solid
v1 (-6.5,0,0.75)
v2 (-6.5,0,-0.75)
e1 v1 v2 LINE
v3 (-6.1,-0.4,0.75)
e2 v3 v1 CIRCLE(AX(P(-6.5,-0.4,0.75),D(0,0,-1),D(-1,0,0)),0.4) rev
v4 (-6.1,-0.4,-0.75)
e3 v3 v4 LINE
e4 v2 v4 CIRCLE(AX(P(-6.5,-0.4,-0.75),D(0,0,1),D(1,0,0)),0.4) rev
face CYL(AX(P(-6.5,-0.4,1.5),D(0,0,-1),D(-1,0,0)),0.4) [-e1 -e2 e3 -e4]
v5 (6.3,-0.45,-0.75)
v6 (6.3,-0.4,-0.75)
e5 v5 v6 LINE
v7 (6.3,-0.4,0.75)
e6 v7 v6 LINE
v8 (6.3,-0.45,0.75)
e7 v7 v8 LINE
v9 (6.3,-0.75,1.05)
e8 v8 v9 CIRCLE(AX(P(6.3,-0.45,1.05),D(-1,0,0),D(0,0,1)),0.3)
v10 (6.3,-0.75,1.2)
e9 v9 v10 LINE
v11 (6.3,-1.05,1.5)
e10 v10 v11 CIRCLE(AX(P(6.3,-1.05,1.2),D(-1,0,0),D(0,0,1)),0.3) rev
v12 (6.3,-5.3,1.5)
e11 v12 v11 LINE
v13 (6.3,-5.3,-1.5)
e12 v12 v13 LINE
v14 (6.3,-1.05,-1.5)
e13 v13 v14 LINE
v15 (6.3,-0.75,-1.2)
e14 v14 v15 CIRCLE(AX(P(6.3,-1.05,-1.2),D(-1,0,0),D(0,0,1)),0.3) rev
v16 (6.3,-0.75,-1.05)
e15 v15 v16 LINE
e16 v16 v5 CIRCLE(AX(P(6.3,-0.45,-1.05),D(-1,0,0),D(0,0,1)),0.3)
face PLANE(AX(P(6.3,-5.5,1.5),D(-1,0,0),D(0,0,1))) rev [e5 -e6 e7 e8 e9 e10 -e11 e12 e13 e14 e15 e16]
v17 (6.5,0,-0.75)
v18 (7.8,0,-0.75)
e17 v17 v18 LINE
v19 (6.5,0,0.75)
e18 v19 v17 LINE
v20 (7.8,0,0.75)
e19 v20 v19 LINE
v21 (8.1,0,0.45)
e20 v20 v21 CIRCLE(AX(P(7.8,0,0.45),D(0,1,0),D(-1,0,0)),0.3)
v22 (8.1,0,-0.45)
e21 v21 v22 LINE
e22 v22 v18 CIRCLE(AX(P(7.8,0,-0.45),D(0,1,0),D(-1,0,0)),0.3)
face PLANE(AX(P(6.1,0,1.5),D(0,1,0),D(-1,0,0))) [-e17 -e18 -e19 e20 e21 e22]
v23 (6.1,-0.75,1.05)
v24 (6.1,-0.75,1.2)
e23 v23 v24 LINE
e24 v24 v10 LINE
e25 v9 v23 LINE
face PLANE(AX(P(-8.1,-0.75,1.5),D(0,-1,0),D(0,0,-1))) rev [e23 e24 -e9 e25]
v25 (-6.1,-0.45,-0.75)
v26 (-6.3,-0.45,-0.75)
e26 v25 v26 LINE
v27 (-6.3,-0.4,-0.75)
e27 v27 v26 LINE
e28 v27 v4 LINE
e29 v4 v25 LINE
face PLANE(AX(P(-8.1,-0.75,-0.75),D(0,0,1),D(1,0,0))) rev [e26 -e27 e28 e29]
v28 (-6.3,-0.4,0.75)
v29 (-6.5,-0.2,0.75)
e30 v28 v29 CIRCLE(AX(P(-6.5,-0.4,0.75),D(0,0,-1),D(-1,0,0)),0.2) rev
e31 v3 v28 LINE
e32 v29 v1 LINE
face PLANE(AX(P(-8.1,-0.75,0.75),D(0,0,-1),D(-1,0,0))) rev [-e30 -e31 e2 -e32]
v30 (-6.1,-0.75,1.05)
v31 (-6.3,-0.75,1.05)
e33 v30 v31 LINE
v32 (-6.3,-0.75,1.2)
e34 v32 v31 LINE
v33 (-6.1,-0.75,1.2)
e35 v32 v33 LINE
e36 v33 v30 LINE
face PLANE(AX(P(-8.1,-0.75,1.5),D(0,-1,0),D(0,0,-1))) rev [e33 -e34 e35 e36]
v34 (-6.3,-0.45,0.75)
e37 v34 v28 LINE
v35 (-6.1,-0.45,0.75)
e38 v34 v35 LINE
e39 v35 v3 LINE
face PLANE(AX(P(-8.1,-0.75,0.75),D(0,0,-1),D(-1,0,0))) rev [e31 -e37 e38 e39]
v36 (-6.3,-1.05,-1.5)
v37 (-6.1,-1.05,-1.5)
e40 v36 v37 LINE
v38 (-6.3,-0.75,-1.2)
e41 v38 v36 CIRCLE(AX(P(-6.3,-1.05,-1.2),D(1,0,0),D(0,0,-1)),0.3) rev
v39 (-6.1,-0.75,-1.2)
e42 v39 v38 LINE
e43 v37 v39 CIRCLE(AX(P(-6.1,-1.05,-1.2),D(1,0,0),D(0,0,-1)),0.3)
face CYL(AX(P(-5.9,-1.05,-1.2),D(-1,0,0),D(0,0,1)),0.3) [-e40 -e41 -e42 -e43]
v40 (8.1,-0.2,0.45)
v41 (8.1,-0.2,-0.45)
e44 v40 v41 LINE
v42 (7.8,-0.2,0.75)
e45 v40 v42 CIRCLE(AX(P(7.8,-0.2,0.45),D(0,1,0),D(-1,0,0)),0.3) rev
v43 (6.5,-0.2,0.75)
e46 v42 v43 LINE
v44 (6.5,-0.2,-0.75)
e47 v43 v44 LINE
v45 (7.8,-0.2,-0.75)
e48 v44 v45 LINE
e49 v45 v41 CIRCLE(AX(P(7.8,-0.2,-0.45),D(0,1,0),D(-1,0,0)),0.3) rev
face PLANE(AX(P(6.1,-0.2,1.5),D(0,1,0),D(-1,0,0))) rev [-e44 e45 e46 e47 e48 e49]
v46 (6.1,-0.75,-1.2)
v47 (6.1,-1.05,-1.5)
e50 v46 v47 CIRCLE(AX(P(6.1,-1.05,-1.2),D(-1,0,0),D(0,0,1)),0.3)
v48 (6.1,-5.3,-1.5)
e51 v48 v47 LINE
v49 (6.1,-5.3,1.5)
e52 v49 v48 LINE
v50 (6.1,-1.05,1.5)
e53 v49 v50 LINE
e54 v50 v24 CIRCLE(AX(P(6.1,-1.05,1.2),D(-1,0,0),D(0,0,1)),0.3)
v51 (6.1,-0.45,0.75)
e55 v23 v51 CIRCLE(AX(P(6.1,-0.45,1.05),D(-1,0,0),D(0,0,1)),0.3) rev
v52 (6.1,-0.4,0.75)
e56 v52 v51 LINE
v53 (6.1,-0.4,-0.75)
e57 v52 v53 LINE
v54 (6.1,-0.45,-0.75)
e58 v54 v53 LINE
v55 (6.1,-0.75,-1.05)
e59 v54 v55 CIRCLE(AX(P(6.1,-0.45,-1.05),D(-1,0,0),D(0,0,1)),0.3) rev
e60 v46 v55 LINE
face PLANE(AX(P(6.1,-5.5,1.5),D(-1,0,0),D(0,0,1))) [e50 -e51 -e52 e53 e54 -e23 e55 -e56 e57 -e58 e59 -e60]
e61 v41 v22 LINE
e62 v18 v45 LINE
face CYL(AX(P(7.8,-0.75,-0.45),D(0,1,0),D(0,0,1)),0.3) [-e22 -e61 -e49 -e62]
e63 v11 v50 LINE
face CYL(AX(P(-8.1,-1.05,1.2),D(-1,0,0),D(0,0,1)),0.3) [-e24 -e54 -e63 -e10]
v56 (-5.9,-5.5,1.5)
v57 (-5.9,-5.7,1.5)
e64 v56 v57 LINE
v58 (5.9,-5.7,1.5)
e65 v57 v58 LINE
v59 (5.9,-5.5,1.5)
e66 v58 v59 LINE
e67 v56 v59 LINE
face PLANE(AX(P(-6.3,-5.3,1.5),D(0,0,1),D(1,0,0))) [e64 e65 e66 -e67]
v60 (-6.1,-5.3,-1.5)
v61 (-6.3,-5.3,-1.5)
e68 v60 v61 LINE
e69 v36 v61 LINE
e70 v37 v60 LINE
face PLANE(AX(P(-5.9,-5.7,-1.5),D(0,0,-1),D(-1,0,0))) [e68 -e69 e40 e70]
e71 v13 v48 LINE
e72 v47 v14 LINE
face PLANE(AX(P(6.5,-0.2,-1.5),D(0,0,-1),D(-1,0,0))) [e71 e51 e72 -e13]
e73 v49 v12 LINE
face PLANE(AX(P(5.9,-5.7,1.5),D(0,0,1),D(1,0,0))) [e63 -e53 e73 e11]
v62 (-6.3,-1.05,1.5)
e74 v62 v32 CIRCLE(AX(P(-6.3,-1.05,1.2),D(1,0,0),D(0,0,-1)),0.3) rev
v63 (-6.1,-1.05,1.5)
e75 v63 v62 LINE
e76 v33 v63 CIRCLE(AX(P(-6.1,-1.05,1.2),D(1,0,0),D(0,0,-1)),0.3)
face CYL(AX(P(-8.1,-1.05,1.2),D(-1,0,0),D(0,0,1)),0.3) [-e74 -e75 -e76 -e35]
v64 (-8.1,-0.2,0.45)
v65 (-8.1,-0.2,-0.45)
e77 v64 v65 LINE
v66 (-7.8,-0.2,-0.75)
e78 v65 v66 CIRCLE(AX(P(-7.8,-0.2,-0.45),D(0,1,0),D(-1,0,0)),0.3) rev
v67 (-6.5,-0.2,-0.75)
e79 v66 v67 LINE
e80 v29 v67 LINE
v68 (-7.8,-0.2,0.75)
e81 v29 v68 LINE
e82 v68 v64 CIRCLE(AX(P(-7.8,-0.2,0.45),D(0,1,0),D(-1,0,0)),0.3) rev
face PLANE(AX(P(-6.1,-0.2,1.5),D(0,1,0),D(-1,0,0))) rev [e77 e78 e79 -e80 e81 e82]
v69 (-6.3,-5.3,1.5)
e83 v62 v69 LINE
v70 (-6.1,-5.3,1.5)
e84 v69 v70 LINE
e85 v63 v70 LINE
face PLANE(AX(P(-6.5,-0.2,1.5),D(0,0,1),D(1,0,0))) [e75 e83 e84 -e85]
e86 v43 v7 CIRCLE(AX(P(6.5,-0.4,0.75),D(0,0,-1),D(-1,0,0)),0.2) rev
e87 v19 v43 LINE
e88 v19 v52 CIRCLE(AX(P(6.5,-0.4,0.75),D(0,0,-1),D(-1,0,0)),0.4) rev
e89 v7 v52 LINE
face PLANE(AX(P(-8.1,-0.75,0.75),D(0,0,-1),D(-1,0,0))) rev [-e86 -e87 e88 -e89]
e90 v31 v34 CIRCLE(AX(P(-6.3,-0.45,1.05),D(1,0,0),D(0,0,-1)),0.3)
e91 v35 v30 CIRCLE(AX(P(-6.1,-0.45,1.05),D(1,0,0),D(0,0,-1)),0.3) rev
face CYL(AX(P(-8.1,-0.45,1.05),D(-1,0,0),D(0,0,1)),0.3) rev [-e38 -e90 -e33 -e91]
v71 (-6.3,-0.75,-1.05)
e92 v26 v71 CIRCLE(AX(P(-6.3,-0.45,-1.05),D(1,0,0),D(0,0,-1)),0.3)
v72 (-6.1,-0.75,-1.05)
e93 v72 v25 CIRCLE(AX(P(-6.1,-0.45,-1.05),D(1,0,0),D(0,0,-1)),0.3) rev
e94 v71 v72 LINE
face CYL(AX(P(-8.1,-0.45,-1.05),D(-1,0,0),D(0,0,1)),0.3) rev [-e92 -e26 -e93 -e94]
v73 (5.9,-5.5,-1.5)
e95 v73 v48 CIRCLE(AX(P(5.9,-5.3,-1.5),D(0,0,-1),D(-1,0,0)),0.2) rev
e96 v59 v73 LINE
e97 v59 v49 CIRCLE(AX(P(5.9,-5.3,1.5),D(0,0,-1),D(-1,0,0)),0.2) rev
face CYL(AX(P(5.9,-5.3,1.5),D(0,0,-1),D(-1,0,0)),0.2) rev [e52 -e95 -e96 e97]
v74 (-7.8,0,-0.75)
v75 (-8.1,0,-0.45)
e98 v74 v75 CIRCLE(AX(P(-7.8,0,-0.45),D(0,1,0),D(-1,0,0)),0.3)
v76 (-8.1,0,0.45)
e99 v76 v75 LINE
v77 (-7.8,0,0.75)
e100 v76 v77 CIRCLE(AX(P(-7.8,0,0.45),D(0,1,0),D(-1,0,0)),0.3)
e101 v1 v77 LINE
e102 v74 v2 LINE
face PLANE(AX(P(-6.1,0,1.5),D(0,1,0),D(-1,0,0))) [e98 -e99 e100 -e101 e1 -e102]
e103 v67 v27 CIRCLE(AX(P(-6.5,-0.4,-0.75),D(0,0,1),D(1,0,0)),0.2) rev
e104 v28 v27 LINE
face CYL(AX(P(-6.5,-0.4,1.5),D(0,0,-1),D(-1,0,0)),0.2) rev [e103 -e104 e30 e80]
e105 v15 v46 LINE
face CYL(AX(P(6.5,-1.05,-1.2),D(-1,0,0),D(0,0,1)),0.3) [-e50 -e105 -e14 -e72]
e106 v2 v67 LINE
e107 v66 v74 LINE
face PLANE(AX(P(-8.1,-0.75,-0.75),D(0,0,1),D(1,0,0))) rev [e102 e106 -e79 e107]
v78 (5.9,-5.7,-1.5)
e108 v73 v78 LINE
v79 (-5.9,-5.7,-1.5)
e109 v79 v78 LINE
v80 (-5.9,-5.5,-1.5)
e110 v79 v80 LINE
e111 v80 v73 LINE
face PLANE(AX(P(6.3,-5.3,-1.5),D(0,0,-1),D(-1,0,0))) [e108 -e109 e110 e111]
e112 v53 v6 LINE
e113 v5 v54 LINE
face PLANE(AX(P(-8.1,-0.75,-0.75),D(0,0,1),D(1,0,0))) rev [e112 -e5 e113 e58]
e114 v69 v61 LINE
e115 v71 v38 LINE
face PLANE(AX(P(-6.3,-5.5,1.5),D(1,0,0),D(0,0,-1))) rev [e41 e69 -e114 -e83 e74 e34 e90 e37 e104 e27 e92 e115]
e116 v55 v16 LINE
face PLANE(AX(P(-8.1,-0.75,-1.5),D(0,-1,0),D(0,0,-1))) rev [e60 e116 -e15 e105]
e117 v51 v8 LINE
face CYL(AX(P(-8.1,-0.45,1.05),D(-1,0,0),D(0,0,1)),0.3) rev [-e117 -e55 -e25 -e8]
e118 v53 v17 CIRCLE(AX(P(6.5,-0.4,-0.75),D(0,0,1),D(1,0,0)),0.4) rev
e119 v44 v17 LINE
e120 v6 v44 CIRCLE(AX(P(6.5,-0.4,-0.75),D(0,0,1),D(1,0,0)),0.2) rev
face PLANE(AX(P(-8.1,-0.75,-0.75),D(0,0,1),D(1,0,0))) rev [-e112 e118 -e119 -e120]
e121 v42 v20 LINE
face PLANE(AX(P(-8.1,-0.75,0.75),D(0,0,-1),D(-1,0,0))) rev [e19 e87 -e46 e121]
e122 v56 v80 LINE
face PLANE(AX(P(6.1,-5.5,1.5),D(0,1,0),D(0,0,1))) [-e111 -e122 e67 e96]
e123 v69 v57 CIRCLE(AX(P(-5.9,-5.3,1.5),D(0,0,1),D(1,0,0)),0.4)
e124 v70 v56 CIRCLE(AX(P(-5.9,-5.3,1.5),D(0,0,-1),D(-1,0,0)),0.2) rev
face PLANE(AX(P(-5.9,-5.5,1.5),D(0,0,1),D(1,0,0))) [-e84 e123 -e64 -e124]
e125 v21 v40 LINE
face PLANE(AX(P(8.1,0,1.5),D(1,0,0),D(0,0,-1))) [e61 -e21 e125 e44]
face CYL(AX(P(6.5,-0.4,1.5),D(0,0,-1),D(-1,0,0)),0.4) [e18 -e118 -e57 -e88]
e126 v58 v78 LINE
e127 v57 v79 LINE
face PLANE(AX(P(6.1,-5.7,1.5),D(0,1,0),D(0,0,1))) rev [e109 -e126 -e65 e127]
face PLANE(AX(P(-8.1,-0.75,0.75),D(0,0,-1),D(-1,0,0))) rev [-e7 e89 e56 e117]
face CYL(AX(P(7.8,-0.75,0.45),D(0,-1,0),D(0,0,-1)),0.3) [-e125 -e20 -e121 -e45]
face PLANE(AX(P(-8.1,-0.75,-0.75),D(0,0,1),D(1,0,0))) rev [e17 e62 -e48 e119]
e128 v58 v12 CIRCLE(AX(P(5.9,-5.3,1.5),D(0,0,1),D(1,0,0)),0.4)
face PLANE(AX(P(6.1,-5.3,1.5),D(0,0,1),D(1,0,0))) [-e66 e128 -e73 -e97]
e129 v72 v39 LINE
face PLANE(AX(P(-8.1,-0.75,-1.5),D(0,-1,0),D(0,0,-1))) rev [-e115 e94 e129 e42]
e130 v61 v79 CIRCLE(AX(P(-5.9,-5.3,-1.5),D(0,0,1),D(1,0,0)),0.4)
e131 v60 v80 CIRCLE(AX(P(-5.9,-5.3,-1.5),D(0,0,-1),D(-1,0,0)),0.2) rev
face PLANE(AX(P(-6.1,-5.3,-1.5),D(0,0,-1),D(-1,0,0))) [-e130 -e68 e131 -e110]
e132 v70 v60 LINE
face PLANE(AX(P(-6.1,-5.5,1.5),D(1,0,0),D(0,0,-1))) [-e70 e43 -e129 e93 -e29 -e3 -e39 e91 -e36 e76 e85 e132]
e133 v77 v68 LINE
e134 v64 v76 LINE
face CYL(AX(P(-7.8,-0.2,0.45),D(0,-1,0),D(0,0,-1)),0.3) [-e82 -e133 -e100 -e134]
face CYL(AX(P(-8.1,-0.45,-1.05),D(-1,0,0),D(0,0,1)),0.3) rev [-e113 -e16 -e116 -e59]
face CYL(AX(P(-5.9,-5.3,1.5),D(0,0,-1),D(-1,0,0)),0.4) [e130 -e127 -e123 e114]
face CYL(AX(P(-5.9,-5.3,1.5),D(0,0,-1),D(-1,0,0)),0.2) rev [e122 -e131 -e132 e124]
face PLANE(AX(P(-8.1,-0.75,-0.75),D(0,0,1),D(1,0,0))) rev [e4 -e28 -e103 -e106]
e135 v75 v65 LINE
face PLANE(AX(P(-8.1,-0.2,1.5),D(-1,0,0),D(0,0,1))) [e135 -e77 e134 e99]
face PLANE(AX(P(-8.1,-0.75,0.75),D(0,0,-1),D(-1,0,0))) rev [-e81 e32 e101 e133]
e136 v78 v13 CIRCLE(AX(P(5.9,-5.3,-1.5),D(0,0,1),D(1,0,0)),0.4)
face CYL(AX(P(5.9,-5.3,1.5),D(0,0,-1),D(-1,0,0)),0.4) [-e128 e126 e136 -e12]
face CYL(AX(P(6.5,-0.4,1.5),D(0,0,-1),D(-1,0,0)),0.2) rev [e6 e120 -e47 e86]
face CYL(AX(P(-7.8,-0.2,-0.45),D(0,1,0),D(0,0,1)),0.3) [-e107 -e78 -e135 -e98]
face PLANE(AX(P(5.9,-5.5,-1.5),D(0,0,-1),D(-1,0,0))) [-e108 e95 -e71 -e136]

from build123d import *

# Parameters (mm, degrees)
BASE_FLANGE1_DEPTH      = 1.5
CUT_EXTRUDE1_DEPTH      = 11.017484714
CUT_EXTRUDE1_DEPTH_BACK = 11.017484714
SKETCH6_W               = 0.75
SKETCH6_H               = 3.25
FILLET1_R               = 0.3
FILLET2_R               = 0.3


# Sheet-metal steps are written as plain solids
with BuildPart() as part:
    # Sketch1 → Base-Flange1 (new, symmetric)
    with BuildSketch(Plane.XY):
        with BuildLine():
            Line((8.1, 0), (6.5, 0))
            ThreePointArc((6.5, 0), (6.217157288, -0.117157288), (6.1, -0.4))
            Line((6.1, -0.4), (6.1, -5.3))
            ThreePointArc((6.1, -5.3), (6.041421356, -5.441421356), (5.9, -5.5))
            Line((5.9, -5.5), (-5.9, -5.5))
            ThreePointArc((-5.9, -5.5), (-6.041421356, -5.441421356), (-6.1, -5.3))
            Line((-6.1, -5.3), (-6.1, -0.4))
            ThreePointArc((-6.1, -0.4), (-6.217157288, -0.117157288), (-6.5, 0))
            Line((-6.5, 0), (-8.1, 0))
            Line((-8.1, 0), (-8.1, -0.2))
            Line((-8.1, -0.2), (-6.5, -0.2))
            ThreePointArc((-6.5, -0.2), (-6.358578644, -0.258578644), (-6.3, -0.4))
            Line((-6.3, -0.4), (-6.3, -5.3))
            ThreePointArc((-6.3, -5.3), (-6.182842712, -5.582842712), (-5.9, -5.7))
            Line((-5.9, -5.7), (5.9, -5.7))
            ThreePointArc((5.9, -5.7), (6.182842712, -5.582842712), (6.3, -5.3))
            Line((6.3, -5.3), (6.3, -0.4))
            ThreePointArc((6.3, -0.4), (6.358578644, -0.258578644), (6.5, -0.2))
            Line((6.5, -0.2), (8.1, -0.2))
            Line((8.1, -0.2), (8.1, 0))
        make_face()
    extrude(amount=BASE_FLANGE1_DEPTH, both=True)

    # Sketch6 → Cut-Extrude1 (cut, two sides: drawn at the far end of the back side and taken through both)
    with BuildSketch(Plane(origin=(0, 0, 0), x_dir=(0, 0, -1), z_dir=(1, 0, 0)).offset(-CUT_EXTRUDE1_DEPTH_BACK)):
        with Locations((1.125, 0.875)):
            Rectangle(SKETCH6_W, SKETCH6_H)
        with Locations((-1.125, 0.875)):
            Rectangle(SKETCH6_W, SKETCH6_H)
    extrude(amount=CUT_EXTRUDE1_DEPTH + CUT_EXTRUDE1_DEPTH_BACK, mode=Mode.SUBTRACT)

    # Fillet1
    fillet1_edges = [part.edges().sort_by_distance(p)[0] for p in [
        (6.2, -0.75, -1.5),
        (-6.2, -0.75, -1.5),
        (6.2, -0.75, -0.75),
        (-6.2, -0.75, -0.75),
        (6.2, -0.75, 1.5),
        (-6.2, -0.75, 1.5),
        (6.2, -0.75, 0.75),
        (-6.2, -0.75, 0.75),
    ]]
    fillet(fillet1_edges, radius=FILLET1_R)

    # Fillet2
    fillet2_edges = [part.edges().sort_by_distance(p)[0] for p in [
        (-8.1, -0.1, -0.75),
        (8.1, -0.1, -0.75),
        (8.1, -0.1, 0.75),
        (-8.1, -0.1, 0.75),
    ]]
    fillet(fillet2_edges, radius=FILLET2_R)


solid = part.part
